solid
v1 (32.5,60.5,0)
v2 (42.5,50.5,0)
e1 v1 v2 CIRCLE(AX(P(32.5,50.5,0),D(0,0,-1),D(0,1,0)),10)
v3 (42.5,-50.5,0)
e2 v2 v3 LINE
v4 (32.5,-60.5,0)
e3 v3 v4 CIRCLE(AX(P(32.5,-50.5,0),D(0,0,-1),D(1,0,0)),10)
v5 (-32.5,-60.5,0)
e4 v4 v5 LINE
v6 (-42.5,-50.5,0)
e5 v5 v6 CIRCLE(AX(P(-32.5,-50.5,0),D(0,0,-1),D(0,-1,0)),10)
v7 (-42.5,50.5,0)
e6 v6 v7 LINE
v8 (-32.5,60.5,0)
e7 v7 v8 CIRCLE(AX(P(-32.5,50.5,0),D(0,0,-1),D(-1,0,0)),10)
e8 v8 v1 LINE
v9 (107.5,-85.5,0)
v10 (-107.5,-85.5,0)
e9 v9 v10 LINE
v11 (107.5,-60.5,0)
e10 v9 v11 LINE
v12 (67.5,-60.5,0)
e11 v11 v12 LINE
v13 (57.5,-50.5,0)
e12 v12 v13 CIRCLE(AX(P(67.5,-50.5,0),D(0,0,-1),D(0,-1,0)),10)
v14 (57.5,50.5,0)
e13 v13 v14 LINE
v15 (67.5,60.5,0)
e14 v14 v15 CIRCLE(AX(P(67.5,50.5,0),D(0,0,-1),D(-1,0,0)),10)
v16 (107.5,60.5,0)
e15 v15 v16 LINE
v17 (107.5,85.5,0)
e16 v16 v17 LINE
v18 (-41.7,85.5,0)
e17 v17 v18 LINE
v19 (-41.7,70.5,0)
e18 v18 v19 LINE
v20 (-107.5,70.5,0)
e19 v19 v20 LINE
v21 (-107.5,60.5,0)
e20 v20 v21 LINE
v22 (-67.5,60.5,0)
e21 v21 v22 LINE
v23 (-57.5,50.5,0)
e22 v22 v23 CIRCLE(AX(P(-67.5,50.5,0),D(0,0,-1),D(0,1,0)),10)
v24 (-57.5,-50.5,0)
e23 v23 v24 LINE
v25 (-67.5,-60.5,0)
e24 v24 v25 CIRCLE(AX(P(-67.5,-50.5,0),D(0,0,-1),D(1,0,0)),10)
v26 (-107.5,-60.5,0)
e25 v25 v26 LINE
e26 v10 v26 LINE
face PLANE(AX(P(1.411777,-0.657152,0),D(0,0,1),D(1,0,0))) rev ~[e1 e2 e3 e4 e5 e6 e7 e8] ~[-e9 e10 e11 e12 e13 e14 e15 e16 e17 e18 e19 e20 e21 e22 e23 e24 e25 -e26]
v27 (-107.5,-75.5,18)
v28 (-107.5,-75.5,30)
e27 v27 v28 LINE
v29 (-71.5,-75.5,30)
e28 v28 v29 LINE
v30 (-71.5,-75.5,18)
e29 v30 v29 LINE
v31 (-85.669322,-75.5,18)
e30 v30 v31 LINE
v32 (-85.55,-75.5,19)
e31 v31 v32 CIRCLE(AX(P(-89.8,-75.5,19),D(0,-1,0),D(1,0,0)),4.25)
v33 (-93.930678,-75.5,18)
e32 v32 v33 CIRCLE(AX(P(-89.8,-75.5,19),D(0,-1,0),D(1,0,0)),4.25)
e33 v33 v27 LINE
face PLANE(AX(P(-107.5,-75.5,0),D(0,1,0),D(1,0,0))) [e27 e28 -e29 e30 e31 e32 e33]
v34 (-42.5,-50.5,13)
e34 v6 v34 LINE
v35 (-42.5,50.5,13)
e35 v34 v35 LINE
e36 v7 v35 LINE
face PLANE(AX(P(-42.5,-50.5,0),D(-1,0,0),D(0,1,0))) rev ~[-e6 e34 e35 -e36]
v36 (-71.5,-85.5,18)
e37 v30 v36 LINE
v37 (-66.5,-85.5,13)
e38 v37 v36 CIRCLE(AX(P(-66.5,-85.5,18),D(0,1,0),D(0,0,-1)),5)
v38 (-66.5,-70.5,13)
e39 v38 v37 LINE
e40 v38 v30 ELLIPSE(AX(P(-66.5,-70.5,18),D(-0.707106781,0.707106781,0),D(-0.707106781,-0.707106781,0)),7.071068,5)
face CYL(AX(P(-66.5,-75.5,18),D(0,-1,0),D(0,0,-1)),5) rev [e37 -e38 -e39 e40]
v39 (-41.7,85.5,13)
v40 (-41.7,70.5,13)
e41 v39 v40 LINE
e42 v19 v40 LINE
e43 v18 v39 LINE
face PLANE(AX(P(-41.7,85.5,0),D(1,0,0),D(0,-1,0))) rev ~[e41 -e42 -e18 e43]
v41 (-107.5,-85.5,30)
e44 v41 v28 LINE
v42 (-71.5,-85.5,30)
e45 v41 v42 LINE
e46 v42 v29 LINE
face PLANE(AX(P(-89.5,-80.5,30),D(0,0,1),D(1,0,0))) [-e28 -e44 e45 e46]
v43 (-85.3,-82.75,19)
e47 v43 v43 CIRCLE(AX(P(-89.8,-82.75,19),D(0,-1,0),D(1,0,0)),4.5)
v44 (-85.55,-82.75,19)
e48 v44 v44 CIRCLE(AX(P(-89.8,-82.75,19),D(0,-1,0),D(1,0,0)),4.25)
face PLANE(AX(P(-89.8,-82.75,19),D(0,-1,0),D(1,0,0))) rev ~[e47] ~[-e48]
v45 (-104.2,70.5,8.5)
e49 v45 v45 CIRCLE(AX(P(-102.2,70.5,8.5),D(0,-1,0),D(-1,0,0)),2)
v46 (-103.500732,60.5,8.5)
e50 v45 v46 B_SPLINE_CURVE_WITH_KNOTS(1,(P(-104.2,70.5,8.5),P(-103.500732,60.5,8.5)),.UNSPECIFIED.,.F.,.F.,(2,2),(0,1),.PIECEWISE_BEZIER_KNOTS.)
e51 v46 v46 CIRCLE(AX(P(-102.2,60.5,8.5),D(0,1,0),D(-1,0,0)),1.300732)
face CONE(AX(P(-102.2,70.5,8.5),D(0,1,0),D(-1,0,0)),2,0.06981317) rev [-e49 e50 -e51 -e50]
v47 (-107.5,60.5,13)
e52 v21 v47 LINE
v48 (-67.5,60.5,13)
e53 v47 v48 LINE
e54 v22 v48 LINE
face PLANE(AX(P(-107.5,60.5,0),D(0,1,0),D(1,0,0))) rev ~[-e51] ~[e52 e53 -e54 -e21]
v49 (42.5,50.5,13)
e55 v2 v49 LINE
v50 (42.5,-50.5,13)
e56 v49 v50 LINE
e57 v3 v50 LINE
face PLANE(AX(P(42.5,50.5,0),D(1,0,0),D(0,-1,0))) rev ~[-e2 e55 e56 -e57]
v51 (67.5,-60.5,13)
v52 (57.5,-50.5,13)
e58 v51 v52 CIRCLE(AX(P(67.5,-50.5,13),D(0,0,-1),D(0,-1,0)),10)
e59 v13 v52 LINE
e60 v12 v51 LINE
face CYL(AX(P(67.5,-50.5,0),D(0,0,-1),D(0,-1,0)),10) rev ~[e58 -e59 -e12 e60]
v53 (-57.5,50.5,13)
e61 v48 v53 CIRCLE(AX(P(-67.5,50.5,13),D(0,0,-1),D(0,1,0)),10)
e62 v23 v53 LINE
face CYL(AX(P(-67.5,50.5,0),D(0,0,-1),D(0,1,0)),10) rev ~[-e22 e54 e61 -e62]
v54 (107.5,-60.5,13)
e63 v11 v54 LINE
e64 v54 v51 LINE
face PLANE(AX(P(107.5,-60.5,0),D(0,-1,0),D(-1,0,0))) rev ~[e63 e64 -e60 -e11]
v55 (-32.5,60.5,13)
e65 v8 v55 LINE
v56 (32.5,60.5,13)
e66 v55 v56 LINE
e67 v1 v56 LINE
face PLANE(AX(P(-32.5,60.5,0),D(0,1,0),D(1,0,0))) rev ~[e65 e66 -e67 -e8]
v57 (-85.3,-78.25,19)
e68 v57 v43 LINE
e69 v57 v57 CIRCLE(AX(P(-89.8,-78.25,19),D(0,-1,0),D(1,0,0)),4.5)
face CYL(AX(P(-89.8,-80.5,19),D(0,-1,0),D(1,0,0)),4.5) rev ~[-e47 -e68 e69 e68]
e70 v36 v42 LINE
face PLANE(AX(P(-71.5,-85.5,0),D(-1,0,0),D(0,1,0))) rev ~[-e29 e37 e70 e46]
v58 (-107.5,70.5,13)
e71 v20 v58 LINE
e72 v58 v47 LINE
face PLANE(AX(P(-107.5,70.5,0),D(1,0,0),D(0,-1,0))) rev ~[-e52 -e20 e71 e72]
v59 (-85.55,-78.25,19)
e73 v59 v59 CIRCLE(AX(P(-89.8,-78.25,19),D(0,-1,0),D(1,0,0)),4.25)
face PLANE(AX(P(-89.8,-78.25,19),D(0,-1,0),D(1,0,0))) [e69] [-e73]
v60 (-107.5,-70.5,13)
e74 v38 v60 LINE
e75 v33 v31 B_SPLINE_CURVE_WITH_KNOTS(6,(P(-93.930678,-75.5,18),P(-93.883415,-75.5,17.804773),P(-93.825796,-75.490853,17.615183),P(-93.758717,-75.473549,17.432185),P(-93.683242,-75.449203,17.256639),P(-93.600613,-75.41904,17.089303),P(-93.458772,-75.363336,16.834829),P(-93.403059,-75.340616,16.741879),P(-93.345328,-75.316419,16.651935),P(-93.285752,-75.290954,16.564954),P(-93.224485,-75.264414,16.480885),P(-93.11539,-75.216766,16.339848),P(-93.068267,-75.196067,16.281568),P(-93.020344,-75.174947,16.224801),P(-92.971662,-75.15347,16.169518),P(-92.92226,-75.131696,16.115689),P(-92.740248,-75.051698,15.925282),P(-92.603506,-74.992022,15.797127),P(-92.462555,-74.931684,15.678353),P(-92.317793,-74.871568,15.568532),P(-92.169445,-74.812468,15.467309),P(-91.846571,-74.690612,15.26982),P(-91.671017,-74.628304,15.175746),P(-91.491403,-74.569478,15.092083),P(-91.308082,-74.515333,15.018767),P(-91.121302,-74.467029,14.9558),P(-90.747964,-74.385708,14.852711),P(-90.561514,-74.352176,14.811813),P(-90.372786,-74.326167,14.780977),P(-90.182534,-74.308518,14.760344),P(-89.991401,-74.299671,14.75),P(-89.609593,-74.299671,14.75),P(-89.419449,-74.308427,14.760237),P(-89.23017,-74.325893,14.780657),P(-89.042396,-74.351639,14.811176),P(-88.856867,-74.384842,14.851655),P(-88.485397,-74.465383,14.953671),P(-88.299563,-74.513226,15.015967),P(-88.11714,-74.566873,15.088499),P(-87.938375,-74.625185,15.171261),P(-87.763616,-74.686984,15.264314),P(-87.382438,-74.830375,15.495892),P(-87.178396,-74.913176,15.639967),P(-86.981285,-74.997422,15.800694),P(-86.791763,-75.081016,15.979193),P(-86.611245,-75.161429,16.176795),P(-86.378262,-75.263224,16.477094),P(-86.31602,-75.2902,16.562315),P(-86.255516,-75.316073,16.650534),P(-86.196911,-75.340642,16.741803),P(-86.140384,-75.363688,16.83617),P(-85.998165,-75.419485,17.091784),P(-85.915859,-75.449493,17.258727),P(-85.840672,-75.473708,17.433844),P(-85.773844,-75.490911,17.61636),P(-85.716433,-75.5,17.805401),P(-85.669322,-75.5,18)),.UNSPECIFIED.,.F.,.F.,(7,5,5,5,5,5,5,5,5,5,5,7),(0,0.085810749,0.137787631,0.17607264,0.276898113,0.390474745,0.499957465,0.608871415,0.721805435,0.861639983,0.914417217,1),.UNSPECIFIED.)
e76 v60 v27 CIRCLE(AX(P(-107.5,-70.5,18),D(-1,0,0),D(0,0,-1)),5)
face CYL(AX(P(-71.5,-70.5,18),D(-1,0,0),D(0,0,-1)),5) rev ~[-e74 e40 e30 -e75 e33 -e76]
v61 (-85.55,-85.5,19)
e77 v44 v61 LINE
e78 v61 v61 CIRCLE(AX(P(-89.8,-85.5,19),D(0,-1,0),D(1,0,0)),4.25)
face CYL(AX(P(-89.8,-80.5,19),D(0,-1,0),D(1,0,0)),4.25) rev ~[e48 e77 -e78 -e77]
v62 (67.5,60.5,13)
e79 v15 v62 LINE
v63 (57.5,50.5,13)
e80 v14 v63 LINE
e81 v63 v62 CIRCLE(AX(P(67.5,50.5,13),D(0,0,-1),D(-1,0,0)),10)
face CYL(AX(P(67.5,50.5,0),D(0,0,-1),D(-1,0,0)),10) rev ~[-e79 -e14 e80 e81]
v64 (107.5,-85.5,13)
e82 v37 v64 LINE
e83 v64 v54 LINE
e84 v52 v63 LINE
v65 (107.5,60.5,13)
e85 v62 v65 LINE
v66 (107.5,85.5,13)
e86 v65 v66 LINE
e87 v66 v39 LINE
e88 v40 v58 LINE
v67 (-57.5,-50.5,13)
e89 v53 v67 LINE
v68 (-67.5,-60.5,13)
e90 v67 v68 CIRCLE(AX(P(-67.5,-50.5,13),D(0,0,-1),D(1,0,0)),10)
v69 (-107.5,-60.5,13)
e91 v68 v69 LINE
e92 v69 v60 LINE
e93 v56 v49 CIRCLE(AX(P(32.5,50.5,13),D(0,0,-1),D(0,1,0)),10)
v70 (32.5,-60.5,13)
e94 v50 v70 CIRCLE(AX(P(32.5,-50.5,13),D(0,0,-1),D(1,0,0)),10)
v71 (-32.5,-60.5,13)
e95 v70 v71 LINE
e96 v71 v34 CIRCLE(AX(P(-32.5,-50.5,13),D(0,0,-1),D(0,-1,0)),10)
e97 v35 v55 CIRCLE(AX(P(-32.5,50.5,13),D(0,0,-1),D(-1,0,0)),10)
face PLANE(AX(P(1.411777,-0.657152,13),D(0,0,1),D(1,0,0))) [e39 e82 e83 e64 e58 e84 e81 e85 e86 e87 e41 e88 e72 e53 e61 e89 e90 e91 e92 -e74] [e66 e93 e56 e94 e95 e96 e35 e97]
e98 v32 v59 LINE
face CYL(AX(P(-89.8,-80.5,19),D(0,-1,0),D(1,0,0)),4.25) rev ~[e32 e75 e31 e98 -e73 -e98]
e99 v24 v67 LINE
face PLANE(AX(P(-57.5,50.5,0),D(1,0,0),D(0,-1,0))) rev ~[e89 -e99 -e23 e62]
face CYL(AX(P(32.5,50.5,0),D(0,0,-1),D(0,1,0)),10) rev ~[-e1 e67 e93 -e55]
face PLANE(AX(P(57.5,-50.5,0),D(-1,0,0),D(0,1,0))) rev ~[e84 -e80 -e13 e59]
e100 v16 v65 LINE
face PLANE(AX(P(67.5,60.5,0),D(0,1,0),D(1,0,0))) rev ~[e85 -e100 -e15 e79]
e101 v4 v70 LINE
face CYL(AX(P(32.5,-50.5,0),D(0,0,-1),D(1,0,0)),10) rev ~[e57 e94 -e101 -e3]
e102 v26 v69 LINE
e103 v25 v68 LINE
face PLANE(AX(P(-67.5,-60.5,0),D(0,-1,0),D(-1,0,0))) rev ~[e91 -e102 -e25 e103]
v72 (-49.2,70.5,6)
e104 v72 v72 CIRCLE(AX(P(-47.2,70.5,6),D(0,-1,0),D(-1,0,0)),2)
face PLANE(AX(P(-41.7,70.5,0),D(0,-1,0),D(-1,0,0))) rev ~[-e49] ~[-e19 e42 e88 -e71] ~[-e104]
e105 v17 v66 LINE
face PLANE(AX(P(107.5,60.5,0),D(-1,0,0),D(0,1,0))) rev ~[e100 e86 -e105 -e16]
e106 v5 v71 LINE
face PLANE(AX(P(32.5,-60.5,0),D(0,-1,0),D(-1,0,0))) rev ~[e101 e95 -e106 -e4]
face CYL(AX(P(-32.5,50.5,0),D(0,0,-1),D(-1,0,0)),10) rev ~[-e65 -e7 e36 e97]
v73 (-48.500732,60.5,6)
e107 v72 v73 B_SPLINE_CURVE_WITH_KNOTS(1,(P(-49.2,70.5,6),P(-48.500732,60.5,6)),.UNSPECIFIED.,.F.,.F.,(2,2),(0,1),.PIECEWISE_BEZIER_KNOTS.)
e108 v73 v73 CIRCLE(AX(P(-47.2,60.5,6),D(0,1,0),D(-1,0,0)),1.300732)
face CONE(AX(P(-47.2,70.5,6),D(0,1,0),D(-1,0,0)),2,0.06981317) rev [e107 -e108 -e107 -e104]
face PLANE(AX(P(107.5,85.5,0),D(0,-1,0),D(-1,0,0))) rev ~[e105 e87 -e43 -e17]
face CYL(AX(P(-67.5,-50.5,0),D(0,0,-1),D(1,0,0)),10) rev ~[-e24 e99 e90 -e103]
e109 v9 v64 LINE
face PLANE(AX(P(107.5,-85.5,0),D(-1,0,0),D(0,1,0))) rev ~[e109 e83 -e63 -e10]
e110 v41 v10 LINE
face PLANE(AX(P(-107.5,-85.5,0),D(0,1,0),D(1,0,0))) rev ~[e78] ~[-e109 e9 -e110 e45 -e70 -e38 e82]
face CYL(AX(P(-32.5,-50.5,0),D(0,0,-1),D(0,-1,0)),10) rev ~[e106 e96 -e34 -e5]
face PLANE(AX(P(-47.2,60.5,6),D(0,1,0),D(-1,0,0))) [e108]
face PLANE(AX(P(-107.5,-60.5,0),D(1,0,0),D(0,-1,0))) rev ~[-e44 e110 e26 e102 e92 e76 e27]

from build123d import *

# Parameters (mm, degrees)
F0_W      = 36
F0_H      = 10
F1_DEPTH  = 13
F3_R      = 2
F4_DEPTH  = 10
F4_TAPER  = 4
F5_DEPTH  = 30
F6_R      = 5
F8_R      = 4.25
F9_DEPTH  = 12.5
F8_R_2    = 4.5
F10_DEPTH = 2.25


# Not quite as in the source:
# - a feature names something its author has since deleted; it is built from what else it names


with BuildPart() as f1:
    # F0 (on Top) → F1 (new body)
    with BuildSketch(Plane.XY):
        with BuildLine():
            Line((-41.7, 85.5), (-41.7, 70.5))
            Line((-41.7, 70.5), (-107.5, 70.5))
            Line((-107.5, 70.5), (-107.5, 60.5))
            Line((-107.5, 60.5), (-67.5, 60.5))
            ThreePointArc((-67.5, 60.5), (-60.4289321881, 57.5710678119), (-57.5, 50.5))
            Line((-57.5, 50.5), (-57.5, -50.5))
            ThreePointArc((-57.5, -50.5), (-60.4289321881, -57.5710678119), (-67.5, -60.5))
            Line((-67.5, -60.5), (-107.5, -60.5))
            Line((-107.5, -60.5), (-107.5, -70.5))
            Line((-107.5, -70.5), (-107.5, -75.5))
            Line((-107.5, -75.5), (-71.5, -75.5))
            Line((-71.5, -75.5), (-71.5, -85.5))
            Line((-71.5, -85.5), (41.7, -85.5))
            Line((41.7, -85.5), (107.5, -85.5))
            Line((107.5, -85.5), (107.5, -70.5))
            Line((107.5, -70.5), (107.5, -60.5))
            Line((107.5, -60.5), (67.5, -60.5))
            ThreePointArc((67.5, -60.5), (60.4289321881, -57.5710678119), (57.5, -50.5))
            Line((57.5, -50.5), (57.5, 50.5))
            ThreePointArc((57.5, 50.5), (60.4289321881, 57.5710678119), (67.5, 60.5))
            Line((67.5, 60.5), (107.5, 60.5))
            Line((107.5, 60.5), (107.5, 70.5))
            Line((107.5, 70.5), (107.5, 85.5))
            Line((107.5, 85.5), (-41.7, 85.5))
        make_face()
        with BuildLine():
            Line((-32.5, 60.5), (32.5, 60.5))
            ThreePointArc((32.5, 60.5), (39.5710678119, 57.5710678119), (42.5, 50.5))
            Line((42.5, 50.5), (42.5, -50.5))
            ThreePointArc((42.5, -50.5), (39.5710678119, -57.5710678119), (32.5, -60.5))
            Line((32.5, -60.5), (-32.5, -60.5))
            ThreePointArc((-32.5, -60.5), (-39.5710678119, -57.5710678119), (-42.5, -50.5))
            Line((-42.5, -50.5), (-42.5, 50.5))
            ThreePointArc((-42.5, 50.5), (-39.5710678119, 57.5710678119), (-32.5, 60.5))
        make_face(mode=Mode.SUBTRACT)
        with Locations((-89.5, -80.5)):
            Rectangle(F0_W, F0_H)
    extrude(amount=F1_DEPTH)

    # F3 (on offset) → F4 (cut)
    with BuildSketch(Plane(origin=(0, 70.5, 0), x_dir=(-1, 0, 0), z_dir=(0, 1, 0))):
        with Locations((47.2, 6)):
            Circle(F3_R)
        with Locations((102.2, 8.5)):
            Circle(F3_R)
    extrude(amount=-F4_DEPTH, taper=F4_TAPER, mode=Mode.SUBTRACT)

    # F0 (on Top) → F5 (join)
    with BuildSketch(Plane.XY):
        with Locations((-89.5, -80.5)):
            Rectangle(F0_W, F0_H)
    extrude(amount=F5_DEPTH)

    # F6
    f6_edges = [f1.edges().sort_by_distance(p)[0] for p in [
        (-89.5, -75.5, 13),
        (-71.5, -80.5, 13),
    ]]
    fillet(f6_edges, radius=F6_R)

    # F8 (on offset) → F9 (cut, symmetric)
    with BuildSketch(Plane.XZ.offset(80.5)):
        with Locations((-89.8, 19)):
            Circle(F8_R)
    extrude(amount=F9_DEPTH, both=True, mode=Mode.SUBTRACT)

    # F8 (on offset) → F10 (cut, symmetric)
    with BuildSketch(Plane.XZ.offset(80.5)):
        with Locations((-89.8, 19)):
            Circle(F8_R_2)
        with Locations((-89.8, 19)):
            Circle(F8_R, mode=Mode.SUBTRACT)
    extrude(amount=F10_DEPTH, both=True, mode=Mode.SUBTRACT)


solid = f1.part
